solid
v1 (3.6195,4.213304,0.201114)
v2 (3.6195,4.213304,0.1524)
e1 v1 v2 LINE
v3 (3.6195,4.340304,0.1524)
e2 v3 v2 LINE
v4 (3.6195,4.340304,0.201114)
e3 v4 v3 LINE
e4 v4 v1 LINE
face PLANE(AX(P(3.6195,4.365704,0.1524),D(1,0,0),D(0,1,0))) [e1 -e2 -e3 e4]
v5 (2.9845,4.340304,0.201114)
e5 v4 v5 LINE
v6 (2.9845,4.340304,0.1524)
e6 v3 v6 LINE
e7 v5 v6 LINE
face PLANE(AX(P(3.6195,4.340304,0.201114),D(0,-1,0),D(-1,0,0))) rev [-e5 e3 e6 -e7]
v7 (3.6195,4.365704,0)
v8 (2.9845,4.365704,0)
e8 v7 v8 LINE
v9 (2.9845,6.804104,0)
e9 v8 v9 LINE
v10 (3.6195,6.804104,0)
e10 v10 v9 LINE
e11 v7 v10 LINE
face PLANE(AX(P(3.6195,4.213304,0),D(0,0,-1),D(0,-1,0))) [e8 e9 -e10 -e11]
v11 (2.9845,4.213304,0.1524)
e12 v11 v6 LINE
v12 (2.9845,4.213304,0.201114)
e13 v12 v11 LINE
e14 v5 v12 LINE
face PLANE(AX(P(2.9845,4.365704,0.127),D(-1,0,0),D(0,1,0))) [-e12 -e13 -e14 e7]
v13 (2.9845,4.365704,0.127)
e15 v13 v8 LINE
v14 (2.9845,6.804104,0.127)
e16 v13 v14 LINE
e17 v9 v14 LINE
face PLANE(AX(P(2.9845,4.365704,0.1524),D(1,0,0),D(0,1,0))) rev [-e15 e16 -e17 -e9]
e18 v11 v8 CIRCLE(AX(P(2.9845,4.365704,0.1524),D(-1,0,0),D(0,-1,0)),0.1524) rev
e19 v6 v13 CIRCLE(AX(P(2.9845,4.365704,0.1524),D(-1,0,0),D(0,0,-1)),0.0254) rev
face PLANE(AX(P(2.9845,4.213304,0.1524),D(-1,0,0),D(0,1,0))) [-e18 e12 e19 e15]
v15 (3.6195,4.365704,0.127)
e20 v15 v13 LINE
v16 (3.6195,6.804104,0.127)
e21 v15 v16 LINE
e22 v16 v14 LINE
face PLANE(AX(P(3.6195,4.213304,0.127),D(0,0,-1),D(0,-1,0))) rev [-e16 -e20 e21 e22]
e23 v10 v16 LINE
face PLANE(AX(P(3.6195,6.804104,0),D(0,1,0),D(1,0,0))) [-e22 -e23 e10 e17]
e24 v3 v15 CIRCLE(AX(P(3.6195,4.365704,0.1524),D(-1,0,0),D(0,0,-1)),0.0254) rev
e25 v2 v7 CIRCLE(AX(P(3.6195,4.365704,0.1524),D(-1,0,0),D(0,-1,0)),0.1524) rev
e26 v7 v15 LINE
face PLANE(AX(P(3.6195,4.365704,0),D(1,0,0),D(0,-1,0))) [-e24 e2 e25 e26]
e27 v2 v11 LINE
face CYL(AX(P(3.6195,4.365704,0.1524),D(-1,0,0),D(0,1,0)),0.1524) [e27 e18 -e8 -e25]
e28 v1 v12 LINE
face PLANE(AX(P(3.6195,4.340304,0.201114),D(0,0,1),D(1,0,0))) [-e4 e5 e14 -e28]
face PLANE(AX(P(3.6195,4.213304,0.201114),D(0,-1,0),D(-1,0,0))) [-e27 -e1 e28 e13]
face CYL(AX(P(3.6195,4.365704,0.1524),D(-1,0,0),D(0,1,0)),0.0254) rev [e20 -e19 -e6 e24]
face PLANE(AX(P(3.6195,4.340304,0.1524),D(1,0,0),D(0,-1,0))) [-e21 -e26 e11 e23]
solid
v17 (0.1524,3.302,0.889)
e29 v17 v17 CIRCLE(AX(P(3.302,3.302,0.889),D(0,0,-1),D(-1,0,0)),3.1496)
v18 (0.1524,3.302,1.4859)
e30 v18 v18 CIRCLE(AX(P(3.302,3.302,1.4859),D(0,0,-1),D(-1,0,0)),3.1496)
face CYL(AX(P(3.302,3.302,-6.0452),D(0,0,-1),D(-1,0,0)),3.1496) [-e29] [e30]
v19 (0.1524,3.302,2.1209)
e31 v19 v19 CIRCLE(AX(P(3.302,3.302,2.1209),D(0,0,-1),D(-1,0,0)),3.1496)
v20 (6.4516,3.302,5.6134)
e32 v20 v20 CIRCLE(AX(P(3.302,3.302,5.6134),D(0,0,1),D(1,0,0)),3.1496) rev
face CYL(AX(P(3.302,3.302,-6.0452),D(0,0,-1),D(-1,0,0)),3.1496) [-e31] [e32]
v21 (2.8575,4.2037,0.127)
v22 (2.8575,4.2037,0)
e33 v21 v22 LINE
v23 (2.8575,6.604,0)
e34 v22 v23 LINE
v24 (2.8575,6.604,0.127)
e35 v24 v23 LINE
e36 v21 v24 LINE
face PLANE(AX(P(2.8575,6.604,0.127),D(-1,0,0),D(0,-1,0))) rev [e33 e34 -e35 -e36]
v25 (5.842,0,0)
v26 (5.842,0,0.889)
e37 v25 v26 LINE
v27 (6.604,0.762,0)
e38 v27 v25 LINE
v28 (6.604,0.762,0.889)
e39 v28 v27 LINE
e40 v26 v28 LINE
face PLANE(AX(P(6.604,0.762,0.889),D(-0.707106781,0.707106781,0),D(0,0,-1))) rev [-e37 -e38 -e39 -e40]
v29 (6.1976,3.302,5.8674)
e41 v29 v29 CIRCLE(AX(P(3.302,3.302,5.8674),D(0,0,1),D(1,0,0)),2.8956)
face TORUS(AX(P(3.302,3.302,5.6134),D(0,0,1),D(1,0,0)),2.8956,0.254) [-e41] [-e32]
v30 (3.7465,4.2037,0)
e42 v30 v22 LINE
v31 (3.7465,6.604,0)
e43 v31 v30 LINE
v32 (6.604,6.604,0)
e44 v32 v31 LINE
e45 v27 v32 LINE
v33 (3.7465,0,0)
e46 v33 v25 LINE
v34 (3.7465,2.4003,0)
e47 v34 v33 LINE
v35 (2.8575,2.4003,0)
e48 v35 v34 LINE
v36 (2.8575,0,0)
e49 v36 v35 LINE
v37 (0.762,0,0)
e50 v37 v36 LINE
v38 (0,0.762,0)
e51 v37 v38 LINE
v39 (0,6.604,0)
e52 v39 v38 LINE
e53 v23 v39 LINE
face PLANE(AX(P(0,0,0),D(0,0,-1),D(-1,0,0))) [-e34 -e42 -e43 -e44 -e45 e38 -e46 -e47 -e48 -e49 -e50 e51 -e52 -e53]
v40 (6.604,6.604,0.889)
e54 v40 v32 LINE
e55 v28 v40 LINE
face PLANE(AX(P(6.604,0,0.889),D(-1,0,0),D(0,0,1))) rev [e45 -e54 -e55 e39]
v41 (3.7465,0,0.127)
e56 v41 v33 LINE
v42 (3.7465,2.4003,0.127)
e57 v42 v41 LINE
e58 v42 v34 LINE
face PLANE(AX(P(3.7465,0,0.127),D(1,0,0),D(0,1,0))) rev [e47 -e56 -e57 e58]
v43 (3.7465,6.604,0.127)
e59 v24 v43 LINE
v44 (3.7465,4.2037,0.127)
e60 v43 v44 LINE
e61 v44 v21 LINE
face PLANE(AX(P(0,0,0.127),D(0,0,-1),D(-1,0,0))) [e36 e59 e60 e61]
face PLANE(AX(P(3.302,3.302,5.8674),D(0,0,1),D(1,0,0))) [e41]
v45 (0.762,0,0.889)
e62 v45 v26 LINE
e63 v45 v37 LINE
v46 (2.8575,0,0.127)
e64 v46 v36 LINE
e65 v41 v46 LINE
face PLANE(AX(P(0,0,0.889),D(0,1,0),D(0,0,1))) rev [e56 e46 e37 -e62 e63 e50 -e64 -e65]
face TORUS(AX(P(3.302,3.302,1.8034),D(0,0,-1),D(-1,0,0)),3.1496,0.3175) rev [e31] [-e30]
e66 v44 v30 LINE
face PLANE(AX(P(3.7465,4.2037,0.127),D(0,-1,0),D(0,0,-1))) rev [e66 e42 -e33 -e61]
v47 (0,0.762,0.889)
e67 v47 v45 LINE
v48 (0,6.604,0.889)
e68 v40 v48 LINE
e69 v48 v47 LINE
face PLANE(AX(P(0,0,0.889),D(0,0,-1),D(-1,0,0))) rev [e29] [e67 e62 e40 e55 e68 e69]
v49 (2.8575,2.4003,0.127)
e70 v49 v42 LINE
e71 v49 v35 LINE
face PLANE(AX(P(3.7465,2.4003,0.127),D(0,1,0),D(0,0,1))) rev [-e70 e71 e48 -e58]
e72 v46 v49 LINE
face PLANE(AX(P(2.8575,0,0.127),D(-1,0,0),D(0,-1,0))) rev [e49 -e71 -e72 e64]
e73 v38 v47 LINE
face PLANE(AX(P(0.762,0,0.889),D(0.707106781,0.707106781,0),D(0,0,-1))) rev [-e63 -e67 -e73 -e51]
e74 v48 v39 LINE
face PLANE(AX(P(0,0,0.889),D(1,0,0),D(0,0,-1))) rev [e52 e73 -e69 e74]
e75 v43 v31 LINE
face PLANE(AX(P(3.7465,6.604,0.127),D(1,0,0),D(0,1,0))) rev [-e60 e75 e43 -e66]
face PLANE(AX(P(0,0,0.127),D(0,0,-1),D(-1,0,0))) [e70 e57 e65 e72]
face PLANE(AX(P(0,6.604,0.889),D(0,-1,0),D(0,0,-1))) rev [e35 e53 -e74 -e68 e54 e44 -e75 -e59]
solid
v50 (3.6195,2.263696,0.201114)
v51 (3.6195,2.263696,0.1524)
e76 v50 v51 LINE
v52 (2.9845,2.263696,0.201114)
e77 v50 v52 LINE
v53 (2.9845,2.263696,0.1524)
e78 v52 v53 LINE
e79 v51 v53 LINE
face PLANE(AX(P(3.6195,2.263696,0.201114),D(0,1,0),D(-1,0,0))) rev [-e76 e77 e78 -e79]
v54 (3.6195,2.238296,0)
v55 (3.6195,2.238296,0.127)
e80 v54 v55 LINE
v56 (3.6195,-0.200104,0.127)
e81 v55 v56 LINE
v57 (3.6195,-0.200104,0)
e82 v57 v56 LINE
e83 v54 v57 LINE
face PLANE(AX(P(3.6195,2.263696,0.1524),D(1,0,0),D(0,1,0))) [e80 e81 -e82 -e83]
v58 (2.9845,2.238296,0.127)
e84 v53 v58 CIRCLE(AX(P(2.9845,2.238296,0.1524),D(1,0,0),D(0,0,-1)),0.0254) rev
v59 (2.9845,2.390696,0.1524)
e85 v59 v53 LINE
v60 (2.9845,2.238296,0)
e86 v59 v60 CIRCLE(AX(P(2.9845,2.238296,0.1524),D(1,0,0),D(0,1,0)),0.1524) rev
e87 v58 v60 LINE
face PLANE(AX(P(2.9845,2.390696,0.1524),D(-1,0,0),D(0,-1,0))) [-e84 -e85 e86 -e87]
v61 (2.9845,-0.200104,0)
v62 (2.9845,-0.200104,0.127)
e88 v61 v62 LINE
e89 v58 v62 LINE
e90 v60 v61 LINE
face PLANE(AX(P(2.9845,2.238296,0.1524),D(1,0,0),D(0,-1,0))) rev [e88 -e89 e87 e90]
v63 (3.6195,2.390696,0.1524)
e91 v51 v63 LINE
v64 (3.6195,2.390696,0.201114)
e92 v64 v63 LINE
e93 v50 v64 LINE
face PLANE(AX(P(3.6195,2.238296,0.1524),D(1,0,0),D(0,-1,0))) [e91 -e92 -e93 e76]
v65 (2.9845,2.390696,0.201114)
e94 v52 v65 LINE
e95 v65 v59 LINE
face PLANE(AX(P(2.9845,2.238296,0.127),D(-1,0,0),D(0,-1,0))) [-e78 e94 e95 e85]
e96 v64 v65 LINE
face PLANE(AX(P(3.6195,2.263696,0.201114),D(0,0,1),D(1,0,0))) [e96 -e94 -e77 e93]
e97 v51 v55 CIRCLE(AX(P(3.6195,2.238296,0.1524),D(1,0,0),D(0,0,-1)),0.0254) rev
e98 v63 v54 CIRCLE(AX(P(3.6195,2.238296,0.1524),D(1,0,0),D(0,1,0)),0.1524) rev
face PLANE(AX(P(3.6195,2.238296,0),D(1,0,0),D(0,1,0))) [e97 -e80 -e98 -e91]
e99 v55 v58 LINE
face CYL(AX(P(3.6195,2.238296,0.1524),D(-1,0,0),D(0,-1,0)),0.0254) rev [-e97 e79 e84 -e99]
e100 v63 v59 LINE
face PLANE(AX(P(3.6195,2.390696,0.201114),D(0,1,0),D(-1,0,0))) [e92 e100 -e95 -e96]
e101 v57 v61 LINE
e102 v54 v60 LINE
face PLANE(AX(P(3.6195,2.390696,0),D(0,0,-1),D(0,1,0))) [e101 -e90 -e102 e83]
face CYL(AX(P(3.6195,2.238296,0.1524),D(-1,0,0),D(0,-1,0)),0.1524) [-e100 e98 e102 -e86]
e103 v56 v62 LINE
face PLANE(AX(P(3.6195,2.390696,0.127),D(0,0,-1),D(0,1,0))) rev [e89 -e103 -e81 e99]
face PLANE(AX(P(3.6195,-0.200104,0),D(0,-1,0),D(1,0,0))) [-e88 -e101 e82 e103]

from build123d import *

# Parameters (mm, degrees)
SKETCH1_W           = 6.604
SKETCH1_H           = 6.604
BOSS_EXTRUDE1_DEPTH = 0.889
FILLET1_R           = 0.254
CHAMFER1_SIZE       = 0.762
SKETCH4_W           = 0.889
SKETCH4_H           = 2.4003
CUT_EXTRUDE1_DEPTH  = 0.127
BASE_FLANGE1_DEPTH  = 0.3175


# Sheet-metal steps are written as plain solids
with BuildPart() as part:
    # Sketch1 → Boss-Extrude1 (new body)
    with BuildSketch(Plane.XY):
        with Locations((3.302, 3.302)):
            Rectangle(SKETCH1_W, SKETCH1_H)
    extrude(amount=BOSS_EXTRUDE1_DEPTH)

    # Sketch2 → Revolve1 (revolve)
    with BuildSketch(Plane(origin=(3.302, 0, 0), x_dir=(0, 0, -1), z_dir=(1, 0, 0)), mode=Mode.PRIVATE) as revolve1_sk:
        with BuildLine():
            Line((-0.889, 3.302), (-5.8674, 3.302))
            Line((-5.8674, 3.302), (-5.8674, 6.4516))
            Line((-5.8674, 6.4516), (-2.1209, 6.4516))
            ThreePointArc((-2.1209, 6.4516), (-1.8034, 6.1341), (-1.4859, 6.4516))
            Line((-1.4859, 6.4516), (-0.889, 6.4516))
            Line((-0.889, 6.4516), (-0.889, 3.302))
        make_face()
    revolve(revolve1_sk.sketch.rotate(Axis((3.302, 3.302, -6.0452), (0, 0, 1)), 90), axis=Axis((3.302, 3.302, -6.0452), (0, 0, 1)))

    # Fillet1
    fillet1_edges = [part.edges().sort_by_distance(p)[0] for p in [
        (6.4516, 3.302, 5.8674),
    ]]
    fillet(fillet1_edges, radius=FILLET1_R)

    # Chamfer1
    chamfer1_edges = [part.edges().sort_by_distance(p)[0] for p in [
        (6.604, 0, 0.4445),
        (0, 0, 0.4445),
    ]]
    chamfer(chamfer1_edges, length=CHAMFER1_SIZE)

    # Sketch4 → Cut-Extrude1 (cut)
    with BuildSketch(Plane(origin=(0, 0, 0), x_dir=(-1, 0, 0), z_dir=(0, 0, -1))):
        with Locations((-3.302, 5.40385)):
            Rectangle(SKETCH4_W, SKETCH4_H)
        with Locations((-3.302, 1.20015)):
            Rectangle(SKETCH4_W, SKETCH4_H)
    extrude(amount=-CUT_EXTRUDE1_DEPTH, mode=Mode.SUBTRACT)


with BuildPart() as body_2:
    # Sketch5 → Base-Flange1 (new, symmetric)
    with BuildSketch(Plane(origin=(3.302, 0, 0), x_dir=(0, 0, -1), z_dir=(1, 0, 0))):
        with BuildLine():
            Line((-0.201114098, 2.390695998), (-0.1524, 2.390695998))
            ThreePointArc((-0.1524, 2.390695998), (-0.044636927, 2.346059072), (0, 2.238295998))
            Line((0, 2.238295998), (0, -0.200104002))
            Line((0, -0.200104002), (-0.127, -0.200104002))
            Line((-0.127, -0.200104002), (-0.127, 2.238295998))
            ThreePointArc((-0.127, 2.238295998), (-0.134439488, 2.25625651), (-0.1524, 2.263695998))
            Line((-0.1524, 2.263695998), (-0.201114098, 2.263695998))
            Line((-0.201114098, 2.263695998), (-0.201114098, 2.390695998))
        make_face()
    extrude(amount=BASE_FLANGE1_DEPTH, both=True)


with BuildPart() as body_3:
    # Mirror1: mirrored copy
    add(body_2.part.mirror(Plane(origin=(0, 3.302, 0), x_dir=(0, 0, 1), z_dir=(0, -1, 0))))


solid = Compound([part.part, body_2.part, body_3.part])
